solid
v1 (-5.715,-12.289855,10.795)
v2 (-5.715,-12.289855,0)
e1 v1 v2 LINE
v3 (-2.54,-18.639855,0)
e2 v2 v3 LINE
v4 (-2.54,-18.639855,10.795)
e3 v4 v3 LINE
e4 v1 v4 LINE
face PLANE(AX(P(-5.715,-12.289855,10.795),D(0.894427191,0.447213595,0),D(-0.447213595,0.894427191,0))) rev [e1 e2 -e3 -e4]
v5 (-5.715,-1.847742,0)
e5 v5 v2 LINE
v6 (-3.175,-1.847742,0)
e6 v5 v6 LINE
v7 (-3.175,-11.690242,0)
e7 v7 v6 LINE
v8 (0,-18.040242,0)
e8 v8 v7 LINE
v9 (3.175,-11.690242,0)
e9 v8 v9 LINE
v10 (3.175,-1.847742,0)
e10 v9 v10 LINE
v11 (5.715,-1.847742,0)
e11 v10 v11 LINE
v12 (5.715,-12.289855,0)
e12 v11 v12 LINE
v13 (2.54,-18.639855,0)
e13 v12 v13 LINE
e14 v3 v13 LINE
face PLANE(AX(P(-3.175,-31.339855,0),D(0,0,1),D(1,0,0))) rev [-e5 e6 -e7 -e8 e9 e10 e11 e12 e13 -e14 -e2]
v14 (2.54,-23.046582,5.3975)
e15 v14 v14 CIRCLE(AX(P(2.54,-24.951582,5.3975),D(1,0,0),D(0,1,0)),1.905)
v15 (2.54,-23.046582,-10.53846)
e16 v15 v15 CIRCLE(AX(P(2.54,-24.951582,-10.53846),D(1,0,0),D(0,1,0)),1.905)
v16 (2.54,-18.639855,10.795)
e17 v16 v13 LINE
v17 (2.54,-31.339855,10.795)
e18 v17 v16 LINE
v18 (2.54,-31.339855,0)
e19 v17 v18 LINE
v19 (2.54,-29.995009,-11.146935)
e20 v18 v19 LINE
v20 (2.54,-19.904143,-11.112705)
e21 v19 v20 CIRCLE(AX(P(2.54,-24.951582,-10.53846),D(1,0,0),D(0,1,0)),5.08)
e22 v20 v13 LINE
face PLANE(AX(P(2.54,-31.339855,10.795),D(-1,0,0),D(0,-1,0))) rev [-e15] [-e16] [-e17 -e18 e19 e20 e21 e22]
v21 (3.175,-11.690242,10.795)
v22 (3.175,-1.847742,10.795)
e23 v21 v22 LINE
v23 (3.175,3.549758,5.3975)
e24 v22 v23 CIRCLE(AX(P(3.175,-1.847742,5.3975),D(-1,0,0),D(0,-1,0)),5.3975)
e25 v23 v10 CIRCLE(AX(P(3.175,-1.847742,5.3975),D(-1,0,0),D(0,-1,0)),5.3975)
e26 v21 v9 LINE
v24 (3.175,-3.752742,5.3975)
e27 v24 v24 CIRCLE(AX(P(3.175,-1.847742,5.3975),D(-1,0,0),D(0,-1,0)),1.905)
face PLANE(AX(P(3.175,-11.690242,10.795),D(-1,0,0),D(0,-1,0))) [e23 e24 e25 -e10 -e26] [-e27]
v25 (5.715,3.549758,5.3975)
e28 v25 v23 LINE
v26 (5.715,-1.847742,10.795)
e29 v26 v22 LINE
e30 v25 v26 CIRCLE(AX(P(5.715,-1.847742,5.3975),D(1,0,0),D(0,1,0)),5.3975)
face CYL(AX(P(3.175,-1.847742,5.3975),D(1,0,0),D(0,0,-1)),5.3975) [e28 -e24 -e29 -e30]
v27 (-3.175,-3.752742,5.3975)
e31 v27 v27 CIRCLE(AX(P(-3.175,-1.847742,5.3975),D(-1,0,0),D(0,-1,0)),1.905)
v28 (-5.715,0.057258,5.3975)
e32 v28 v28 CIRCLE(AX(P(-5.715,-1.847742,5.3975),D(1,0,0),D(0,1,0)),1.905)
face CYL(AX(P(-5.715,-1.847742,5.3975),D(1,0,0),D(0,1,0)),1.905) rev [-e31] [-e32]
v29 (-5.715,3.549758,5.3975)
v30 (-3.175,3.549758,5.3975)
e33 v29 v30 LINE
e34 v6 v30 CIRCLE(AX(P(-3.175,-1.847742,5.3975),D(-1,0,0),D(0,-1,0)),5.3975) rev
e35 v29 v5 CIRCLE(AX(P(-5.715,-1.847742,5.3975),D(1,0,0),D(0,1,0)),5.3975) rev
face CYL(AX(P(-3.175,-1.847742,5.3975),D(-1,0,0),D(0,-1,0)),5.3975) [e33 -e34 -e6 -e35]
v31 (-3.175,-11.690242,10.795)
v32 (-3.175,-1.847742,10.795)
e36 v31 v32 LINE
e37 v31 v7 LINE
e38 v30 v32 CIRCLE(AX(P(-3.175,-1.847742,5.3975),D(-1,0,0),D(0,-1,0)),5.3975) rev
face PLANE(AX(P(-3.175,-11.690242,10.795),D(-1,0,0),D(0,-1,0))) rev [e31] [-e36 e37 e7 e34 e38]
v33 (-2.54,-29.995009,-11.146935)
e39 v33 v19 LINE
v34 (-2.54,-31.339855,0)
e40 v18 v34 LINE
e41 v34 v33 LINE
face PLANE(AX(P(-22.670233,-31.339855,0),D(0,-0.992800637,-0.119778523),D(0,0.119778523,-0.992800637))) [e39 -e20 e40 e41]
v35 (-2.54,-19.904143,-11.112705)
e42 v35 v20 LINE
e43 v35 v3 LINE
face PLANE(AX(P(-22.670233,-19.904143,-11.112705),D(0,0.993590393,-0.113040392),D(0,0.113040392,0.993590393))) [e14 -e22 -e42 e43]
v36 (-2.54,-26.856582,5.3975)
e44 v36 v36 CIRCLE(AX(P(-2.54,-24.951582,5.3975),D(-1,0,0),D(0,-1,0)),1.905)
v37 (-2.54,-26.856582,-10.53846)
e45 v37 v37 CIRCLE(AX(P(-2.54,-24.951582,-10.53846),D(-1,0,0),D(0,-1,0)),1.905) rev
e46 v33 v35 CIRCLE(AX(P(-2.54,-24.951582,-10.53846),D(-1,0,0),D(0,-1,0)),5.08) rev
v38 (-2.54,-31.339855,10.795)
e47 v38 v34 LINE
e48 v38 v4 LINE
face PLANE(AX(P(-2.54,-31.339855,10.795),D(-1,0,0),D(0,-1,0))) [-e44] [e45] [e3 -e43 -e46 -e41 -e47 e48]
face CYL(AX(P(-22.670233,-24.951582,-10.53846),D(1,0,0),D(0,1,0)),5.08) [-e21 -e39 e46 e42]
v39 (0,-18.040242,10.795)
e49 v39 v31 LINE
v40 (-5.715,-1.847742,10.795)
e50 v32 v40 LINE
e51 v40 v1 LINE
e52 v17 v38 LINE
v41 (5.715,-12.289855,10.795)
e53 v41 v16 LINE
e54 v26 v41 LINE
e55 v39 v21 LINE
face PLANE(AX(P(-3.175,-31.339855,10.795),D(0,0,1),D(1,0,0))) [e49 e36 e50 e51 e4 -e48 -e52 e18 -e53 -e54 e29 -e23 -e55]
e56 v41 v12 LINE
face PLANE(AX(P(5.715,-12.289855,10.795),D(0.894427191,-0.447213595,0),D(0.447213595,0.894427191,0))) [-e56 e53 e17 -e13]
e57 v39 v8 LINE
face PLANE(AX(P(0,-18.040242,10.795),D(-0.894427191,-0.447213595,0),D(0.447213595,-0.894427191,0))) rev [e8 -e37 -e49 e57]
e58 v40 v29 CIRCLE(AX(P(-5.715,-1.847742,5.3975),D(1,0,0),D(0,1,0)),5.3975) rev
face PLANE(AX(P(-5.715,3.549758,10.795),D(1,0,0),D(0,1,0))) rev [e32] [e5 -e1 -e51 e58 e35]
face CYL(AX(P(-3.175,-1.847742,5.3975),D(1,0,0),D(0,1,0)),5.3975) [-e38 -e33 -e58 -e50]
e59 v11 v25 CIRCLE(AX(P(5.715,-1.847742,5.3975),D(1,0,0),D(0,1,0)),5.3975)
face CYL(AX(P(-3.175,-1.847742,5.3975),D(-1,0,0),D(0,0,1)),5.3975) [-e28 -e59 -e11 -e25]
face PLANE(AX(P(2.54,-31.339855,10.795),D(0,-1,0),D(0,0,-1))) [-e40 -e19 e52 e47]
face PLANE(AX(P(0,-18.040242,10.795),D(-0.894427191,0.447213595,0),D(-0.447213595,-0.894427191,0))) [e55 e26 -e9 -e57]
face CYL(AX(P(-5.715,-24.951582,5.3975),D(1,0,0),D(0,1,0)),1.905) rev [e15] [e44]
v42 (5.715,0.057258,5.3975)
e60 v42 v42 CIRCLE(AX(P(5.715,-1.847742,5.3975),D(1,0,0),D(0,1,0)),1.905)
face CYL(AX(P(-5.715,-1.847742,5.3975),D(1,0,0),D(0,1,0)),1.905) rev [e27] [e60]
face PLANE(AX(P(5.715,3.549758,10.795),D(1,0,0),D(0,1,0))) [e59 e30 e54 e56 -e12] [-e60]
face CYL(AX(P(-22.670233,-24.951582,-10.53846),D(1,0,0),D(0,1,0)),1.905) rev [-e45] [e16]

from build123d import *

# Parameters (mm, degrees)
BASE_EXTRUDE_DEPTH  = 10.795
SKETCH2_R           = 1.905
CUT_EXTRUDE1_DEPTH  = 36.062279171
FILLET1_R           = 5.3975
SKETCH3_R           = 1.905
CUT_EXTRUDE2_DEPTH  = 35.159384445
BOSS_EXTRUDE1_START = -5.08
SKETCH4_R           = 1.905
BOSS_EXTRUDE1_DEPTH = 5.08


with BuildPart() as part:
    # Sketch1 → Base-Extrude (new body)
    with BuildSketch(Plane.XY):
        Polygon((-3.175, 3.549757914), (-5.715, 3.549757914), (-5.715, -12.289854749), (-2.54, -18.639854749), (-2.54, -31.339854749), (2.54, -31.339854749), (2.54, -18.639854749), (5.715, -12.289854749), (5.715, 3.549757914), (3.175, 3.549757914), (3.175, -11.690242086), (0, -18.040242086), (-3.175, -11.690242086), align=None)
    extrude(amount=BASE_EXTRUDE_DEPTH)

    # Sketch2 → Cut-Extrude1 (cut, through all)
    with BuildSketch(Plane(origin=(5.715, 0, 0), x_dir=(0, 0, -1), z_dir=(1, 0, 0))):
        with Locations(Location((-5.3975, -1.847742086, 0), (0, 0, 90))):
            Circle(SKETCH2_R)
    extrude(amount=-CUT_EXTRUDE1_DEPTH, mode=Mode.SUBTRACT)

    # Fillet1
    # the kernel refuses this fillet: 5.3975 mm, written as the material it takes off along each edge
    with BuildSketch(Plane(origin=(19.20875, 3.549757914, 0), x_dir=(0, -1, 0), z_dir=(-1, 0, 0)), Plane(origin=(10.31875, 3.549757914, 10.795), x_dir=(0, 0, -1), z_dir=(-1, 0, 0))) as fillet1_piece_1:
        with BuildLine():
            CenterArc((FILLET1_R, FILLET1_R), FILLET1_R, 180, 90)
            Line((0, FILLET1_R), (0, 0))
            Line((0, 0), (FILLET1_R, 0))
        make_face()
    extrude(amount=29.5275, mode=Mode.SUBTRACT)
    with BuildSketch(Plane(origin=(10.31875, 3.549757914, 0), x_dir=(0, 0, 1), z_dir=(-1, 0, 0)), Plane(origin=(19.20875, 3.549757914, 10.795), x_dir=(0, -1, 0), z_dir=(-1, 0, 0))) as fillet1_piece_2:
        with BuildLine():
            CenterArc((FILLET1_R, -FILLET1_R), FILLET1_R, 90, 90)
            Line((0, -FILLET1_R), (0, 0))
            Line((0, 0), (FILLET1_R, 0))
        make_face()
    extrude(amount=29.5275, mode=Mode.SUBTRACT)

    # Sketch3 → Cut-Extrude2 (cut, through all)
    with BuildSketch(Plane(origin=(2.54, 0, 0), x_dir=(0, 0, -1), z_dir=(1, 0, 0))):
        with Locations(Location((-5.3975, -24.951582086, 0), (0, 0, 90))):
            Circle(SKETCH3_R)
    extrude(amount=-CUT_EXTRUDE2_DEPTH, mode=Mode.SUBTRACT)

    # Sketch4 → Boss-Extrude1 (add)
    with BuildSketch(Plane(origin=(2.54, 0, 0), x_dir=(0, 0, -1), z_dir=(1, 0, 0)).offset(BOSS_EXTRUDE1_START)):
        with BuildLine():
            Line((0, -31.339854749), (11.146934896, -29.995009323))
            ThreePointArc((11.146934896, -29.995009323), (15.618430773, -24.934350077), (11.112705191, -19.904142887))
            Line((11.112705191, -19.904142887), (0, -18.639854749))
            Line((0, -18.639854749), (0, -31.339854749))
        make_face()
        with Locations(Location((10.53846, -24.951582086, 0), (0, 0, 90))):
            Circle(SKETCH4_R, mode=Mode.SUBTRACT)
    extrude(amount=BOSS_EXTRUDE1_DEPTH)


solid = part.part
